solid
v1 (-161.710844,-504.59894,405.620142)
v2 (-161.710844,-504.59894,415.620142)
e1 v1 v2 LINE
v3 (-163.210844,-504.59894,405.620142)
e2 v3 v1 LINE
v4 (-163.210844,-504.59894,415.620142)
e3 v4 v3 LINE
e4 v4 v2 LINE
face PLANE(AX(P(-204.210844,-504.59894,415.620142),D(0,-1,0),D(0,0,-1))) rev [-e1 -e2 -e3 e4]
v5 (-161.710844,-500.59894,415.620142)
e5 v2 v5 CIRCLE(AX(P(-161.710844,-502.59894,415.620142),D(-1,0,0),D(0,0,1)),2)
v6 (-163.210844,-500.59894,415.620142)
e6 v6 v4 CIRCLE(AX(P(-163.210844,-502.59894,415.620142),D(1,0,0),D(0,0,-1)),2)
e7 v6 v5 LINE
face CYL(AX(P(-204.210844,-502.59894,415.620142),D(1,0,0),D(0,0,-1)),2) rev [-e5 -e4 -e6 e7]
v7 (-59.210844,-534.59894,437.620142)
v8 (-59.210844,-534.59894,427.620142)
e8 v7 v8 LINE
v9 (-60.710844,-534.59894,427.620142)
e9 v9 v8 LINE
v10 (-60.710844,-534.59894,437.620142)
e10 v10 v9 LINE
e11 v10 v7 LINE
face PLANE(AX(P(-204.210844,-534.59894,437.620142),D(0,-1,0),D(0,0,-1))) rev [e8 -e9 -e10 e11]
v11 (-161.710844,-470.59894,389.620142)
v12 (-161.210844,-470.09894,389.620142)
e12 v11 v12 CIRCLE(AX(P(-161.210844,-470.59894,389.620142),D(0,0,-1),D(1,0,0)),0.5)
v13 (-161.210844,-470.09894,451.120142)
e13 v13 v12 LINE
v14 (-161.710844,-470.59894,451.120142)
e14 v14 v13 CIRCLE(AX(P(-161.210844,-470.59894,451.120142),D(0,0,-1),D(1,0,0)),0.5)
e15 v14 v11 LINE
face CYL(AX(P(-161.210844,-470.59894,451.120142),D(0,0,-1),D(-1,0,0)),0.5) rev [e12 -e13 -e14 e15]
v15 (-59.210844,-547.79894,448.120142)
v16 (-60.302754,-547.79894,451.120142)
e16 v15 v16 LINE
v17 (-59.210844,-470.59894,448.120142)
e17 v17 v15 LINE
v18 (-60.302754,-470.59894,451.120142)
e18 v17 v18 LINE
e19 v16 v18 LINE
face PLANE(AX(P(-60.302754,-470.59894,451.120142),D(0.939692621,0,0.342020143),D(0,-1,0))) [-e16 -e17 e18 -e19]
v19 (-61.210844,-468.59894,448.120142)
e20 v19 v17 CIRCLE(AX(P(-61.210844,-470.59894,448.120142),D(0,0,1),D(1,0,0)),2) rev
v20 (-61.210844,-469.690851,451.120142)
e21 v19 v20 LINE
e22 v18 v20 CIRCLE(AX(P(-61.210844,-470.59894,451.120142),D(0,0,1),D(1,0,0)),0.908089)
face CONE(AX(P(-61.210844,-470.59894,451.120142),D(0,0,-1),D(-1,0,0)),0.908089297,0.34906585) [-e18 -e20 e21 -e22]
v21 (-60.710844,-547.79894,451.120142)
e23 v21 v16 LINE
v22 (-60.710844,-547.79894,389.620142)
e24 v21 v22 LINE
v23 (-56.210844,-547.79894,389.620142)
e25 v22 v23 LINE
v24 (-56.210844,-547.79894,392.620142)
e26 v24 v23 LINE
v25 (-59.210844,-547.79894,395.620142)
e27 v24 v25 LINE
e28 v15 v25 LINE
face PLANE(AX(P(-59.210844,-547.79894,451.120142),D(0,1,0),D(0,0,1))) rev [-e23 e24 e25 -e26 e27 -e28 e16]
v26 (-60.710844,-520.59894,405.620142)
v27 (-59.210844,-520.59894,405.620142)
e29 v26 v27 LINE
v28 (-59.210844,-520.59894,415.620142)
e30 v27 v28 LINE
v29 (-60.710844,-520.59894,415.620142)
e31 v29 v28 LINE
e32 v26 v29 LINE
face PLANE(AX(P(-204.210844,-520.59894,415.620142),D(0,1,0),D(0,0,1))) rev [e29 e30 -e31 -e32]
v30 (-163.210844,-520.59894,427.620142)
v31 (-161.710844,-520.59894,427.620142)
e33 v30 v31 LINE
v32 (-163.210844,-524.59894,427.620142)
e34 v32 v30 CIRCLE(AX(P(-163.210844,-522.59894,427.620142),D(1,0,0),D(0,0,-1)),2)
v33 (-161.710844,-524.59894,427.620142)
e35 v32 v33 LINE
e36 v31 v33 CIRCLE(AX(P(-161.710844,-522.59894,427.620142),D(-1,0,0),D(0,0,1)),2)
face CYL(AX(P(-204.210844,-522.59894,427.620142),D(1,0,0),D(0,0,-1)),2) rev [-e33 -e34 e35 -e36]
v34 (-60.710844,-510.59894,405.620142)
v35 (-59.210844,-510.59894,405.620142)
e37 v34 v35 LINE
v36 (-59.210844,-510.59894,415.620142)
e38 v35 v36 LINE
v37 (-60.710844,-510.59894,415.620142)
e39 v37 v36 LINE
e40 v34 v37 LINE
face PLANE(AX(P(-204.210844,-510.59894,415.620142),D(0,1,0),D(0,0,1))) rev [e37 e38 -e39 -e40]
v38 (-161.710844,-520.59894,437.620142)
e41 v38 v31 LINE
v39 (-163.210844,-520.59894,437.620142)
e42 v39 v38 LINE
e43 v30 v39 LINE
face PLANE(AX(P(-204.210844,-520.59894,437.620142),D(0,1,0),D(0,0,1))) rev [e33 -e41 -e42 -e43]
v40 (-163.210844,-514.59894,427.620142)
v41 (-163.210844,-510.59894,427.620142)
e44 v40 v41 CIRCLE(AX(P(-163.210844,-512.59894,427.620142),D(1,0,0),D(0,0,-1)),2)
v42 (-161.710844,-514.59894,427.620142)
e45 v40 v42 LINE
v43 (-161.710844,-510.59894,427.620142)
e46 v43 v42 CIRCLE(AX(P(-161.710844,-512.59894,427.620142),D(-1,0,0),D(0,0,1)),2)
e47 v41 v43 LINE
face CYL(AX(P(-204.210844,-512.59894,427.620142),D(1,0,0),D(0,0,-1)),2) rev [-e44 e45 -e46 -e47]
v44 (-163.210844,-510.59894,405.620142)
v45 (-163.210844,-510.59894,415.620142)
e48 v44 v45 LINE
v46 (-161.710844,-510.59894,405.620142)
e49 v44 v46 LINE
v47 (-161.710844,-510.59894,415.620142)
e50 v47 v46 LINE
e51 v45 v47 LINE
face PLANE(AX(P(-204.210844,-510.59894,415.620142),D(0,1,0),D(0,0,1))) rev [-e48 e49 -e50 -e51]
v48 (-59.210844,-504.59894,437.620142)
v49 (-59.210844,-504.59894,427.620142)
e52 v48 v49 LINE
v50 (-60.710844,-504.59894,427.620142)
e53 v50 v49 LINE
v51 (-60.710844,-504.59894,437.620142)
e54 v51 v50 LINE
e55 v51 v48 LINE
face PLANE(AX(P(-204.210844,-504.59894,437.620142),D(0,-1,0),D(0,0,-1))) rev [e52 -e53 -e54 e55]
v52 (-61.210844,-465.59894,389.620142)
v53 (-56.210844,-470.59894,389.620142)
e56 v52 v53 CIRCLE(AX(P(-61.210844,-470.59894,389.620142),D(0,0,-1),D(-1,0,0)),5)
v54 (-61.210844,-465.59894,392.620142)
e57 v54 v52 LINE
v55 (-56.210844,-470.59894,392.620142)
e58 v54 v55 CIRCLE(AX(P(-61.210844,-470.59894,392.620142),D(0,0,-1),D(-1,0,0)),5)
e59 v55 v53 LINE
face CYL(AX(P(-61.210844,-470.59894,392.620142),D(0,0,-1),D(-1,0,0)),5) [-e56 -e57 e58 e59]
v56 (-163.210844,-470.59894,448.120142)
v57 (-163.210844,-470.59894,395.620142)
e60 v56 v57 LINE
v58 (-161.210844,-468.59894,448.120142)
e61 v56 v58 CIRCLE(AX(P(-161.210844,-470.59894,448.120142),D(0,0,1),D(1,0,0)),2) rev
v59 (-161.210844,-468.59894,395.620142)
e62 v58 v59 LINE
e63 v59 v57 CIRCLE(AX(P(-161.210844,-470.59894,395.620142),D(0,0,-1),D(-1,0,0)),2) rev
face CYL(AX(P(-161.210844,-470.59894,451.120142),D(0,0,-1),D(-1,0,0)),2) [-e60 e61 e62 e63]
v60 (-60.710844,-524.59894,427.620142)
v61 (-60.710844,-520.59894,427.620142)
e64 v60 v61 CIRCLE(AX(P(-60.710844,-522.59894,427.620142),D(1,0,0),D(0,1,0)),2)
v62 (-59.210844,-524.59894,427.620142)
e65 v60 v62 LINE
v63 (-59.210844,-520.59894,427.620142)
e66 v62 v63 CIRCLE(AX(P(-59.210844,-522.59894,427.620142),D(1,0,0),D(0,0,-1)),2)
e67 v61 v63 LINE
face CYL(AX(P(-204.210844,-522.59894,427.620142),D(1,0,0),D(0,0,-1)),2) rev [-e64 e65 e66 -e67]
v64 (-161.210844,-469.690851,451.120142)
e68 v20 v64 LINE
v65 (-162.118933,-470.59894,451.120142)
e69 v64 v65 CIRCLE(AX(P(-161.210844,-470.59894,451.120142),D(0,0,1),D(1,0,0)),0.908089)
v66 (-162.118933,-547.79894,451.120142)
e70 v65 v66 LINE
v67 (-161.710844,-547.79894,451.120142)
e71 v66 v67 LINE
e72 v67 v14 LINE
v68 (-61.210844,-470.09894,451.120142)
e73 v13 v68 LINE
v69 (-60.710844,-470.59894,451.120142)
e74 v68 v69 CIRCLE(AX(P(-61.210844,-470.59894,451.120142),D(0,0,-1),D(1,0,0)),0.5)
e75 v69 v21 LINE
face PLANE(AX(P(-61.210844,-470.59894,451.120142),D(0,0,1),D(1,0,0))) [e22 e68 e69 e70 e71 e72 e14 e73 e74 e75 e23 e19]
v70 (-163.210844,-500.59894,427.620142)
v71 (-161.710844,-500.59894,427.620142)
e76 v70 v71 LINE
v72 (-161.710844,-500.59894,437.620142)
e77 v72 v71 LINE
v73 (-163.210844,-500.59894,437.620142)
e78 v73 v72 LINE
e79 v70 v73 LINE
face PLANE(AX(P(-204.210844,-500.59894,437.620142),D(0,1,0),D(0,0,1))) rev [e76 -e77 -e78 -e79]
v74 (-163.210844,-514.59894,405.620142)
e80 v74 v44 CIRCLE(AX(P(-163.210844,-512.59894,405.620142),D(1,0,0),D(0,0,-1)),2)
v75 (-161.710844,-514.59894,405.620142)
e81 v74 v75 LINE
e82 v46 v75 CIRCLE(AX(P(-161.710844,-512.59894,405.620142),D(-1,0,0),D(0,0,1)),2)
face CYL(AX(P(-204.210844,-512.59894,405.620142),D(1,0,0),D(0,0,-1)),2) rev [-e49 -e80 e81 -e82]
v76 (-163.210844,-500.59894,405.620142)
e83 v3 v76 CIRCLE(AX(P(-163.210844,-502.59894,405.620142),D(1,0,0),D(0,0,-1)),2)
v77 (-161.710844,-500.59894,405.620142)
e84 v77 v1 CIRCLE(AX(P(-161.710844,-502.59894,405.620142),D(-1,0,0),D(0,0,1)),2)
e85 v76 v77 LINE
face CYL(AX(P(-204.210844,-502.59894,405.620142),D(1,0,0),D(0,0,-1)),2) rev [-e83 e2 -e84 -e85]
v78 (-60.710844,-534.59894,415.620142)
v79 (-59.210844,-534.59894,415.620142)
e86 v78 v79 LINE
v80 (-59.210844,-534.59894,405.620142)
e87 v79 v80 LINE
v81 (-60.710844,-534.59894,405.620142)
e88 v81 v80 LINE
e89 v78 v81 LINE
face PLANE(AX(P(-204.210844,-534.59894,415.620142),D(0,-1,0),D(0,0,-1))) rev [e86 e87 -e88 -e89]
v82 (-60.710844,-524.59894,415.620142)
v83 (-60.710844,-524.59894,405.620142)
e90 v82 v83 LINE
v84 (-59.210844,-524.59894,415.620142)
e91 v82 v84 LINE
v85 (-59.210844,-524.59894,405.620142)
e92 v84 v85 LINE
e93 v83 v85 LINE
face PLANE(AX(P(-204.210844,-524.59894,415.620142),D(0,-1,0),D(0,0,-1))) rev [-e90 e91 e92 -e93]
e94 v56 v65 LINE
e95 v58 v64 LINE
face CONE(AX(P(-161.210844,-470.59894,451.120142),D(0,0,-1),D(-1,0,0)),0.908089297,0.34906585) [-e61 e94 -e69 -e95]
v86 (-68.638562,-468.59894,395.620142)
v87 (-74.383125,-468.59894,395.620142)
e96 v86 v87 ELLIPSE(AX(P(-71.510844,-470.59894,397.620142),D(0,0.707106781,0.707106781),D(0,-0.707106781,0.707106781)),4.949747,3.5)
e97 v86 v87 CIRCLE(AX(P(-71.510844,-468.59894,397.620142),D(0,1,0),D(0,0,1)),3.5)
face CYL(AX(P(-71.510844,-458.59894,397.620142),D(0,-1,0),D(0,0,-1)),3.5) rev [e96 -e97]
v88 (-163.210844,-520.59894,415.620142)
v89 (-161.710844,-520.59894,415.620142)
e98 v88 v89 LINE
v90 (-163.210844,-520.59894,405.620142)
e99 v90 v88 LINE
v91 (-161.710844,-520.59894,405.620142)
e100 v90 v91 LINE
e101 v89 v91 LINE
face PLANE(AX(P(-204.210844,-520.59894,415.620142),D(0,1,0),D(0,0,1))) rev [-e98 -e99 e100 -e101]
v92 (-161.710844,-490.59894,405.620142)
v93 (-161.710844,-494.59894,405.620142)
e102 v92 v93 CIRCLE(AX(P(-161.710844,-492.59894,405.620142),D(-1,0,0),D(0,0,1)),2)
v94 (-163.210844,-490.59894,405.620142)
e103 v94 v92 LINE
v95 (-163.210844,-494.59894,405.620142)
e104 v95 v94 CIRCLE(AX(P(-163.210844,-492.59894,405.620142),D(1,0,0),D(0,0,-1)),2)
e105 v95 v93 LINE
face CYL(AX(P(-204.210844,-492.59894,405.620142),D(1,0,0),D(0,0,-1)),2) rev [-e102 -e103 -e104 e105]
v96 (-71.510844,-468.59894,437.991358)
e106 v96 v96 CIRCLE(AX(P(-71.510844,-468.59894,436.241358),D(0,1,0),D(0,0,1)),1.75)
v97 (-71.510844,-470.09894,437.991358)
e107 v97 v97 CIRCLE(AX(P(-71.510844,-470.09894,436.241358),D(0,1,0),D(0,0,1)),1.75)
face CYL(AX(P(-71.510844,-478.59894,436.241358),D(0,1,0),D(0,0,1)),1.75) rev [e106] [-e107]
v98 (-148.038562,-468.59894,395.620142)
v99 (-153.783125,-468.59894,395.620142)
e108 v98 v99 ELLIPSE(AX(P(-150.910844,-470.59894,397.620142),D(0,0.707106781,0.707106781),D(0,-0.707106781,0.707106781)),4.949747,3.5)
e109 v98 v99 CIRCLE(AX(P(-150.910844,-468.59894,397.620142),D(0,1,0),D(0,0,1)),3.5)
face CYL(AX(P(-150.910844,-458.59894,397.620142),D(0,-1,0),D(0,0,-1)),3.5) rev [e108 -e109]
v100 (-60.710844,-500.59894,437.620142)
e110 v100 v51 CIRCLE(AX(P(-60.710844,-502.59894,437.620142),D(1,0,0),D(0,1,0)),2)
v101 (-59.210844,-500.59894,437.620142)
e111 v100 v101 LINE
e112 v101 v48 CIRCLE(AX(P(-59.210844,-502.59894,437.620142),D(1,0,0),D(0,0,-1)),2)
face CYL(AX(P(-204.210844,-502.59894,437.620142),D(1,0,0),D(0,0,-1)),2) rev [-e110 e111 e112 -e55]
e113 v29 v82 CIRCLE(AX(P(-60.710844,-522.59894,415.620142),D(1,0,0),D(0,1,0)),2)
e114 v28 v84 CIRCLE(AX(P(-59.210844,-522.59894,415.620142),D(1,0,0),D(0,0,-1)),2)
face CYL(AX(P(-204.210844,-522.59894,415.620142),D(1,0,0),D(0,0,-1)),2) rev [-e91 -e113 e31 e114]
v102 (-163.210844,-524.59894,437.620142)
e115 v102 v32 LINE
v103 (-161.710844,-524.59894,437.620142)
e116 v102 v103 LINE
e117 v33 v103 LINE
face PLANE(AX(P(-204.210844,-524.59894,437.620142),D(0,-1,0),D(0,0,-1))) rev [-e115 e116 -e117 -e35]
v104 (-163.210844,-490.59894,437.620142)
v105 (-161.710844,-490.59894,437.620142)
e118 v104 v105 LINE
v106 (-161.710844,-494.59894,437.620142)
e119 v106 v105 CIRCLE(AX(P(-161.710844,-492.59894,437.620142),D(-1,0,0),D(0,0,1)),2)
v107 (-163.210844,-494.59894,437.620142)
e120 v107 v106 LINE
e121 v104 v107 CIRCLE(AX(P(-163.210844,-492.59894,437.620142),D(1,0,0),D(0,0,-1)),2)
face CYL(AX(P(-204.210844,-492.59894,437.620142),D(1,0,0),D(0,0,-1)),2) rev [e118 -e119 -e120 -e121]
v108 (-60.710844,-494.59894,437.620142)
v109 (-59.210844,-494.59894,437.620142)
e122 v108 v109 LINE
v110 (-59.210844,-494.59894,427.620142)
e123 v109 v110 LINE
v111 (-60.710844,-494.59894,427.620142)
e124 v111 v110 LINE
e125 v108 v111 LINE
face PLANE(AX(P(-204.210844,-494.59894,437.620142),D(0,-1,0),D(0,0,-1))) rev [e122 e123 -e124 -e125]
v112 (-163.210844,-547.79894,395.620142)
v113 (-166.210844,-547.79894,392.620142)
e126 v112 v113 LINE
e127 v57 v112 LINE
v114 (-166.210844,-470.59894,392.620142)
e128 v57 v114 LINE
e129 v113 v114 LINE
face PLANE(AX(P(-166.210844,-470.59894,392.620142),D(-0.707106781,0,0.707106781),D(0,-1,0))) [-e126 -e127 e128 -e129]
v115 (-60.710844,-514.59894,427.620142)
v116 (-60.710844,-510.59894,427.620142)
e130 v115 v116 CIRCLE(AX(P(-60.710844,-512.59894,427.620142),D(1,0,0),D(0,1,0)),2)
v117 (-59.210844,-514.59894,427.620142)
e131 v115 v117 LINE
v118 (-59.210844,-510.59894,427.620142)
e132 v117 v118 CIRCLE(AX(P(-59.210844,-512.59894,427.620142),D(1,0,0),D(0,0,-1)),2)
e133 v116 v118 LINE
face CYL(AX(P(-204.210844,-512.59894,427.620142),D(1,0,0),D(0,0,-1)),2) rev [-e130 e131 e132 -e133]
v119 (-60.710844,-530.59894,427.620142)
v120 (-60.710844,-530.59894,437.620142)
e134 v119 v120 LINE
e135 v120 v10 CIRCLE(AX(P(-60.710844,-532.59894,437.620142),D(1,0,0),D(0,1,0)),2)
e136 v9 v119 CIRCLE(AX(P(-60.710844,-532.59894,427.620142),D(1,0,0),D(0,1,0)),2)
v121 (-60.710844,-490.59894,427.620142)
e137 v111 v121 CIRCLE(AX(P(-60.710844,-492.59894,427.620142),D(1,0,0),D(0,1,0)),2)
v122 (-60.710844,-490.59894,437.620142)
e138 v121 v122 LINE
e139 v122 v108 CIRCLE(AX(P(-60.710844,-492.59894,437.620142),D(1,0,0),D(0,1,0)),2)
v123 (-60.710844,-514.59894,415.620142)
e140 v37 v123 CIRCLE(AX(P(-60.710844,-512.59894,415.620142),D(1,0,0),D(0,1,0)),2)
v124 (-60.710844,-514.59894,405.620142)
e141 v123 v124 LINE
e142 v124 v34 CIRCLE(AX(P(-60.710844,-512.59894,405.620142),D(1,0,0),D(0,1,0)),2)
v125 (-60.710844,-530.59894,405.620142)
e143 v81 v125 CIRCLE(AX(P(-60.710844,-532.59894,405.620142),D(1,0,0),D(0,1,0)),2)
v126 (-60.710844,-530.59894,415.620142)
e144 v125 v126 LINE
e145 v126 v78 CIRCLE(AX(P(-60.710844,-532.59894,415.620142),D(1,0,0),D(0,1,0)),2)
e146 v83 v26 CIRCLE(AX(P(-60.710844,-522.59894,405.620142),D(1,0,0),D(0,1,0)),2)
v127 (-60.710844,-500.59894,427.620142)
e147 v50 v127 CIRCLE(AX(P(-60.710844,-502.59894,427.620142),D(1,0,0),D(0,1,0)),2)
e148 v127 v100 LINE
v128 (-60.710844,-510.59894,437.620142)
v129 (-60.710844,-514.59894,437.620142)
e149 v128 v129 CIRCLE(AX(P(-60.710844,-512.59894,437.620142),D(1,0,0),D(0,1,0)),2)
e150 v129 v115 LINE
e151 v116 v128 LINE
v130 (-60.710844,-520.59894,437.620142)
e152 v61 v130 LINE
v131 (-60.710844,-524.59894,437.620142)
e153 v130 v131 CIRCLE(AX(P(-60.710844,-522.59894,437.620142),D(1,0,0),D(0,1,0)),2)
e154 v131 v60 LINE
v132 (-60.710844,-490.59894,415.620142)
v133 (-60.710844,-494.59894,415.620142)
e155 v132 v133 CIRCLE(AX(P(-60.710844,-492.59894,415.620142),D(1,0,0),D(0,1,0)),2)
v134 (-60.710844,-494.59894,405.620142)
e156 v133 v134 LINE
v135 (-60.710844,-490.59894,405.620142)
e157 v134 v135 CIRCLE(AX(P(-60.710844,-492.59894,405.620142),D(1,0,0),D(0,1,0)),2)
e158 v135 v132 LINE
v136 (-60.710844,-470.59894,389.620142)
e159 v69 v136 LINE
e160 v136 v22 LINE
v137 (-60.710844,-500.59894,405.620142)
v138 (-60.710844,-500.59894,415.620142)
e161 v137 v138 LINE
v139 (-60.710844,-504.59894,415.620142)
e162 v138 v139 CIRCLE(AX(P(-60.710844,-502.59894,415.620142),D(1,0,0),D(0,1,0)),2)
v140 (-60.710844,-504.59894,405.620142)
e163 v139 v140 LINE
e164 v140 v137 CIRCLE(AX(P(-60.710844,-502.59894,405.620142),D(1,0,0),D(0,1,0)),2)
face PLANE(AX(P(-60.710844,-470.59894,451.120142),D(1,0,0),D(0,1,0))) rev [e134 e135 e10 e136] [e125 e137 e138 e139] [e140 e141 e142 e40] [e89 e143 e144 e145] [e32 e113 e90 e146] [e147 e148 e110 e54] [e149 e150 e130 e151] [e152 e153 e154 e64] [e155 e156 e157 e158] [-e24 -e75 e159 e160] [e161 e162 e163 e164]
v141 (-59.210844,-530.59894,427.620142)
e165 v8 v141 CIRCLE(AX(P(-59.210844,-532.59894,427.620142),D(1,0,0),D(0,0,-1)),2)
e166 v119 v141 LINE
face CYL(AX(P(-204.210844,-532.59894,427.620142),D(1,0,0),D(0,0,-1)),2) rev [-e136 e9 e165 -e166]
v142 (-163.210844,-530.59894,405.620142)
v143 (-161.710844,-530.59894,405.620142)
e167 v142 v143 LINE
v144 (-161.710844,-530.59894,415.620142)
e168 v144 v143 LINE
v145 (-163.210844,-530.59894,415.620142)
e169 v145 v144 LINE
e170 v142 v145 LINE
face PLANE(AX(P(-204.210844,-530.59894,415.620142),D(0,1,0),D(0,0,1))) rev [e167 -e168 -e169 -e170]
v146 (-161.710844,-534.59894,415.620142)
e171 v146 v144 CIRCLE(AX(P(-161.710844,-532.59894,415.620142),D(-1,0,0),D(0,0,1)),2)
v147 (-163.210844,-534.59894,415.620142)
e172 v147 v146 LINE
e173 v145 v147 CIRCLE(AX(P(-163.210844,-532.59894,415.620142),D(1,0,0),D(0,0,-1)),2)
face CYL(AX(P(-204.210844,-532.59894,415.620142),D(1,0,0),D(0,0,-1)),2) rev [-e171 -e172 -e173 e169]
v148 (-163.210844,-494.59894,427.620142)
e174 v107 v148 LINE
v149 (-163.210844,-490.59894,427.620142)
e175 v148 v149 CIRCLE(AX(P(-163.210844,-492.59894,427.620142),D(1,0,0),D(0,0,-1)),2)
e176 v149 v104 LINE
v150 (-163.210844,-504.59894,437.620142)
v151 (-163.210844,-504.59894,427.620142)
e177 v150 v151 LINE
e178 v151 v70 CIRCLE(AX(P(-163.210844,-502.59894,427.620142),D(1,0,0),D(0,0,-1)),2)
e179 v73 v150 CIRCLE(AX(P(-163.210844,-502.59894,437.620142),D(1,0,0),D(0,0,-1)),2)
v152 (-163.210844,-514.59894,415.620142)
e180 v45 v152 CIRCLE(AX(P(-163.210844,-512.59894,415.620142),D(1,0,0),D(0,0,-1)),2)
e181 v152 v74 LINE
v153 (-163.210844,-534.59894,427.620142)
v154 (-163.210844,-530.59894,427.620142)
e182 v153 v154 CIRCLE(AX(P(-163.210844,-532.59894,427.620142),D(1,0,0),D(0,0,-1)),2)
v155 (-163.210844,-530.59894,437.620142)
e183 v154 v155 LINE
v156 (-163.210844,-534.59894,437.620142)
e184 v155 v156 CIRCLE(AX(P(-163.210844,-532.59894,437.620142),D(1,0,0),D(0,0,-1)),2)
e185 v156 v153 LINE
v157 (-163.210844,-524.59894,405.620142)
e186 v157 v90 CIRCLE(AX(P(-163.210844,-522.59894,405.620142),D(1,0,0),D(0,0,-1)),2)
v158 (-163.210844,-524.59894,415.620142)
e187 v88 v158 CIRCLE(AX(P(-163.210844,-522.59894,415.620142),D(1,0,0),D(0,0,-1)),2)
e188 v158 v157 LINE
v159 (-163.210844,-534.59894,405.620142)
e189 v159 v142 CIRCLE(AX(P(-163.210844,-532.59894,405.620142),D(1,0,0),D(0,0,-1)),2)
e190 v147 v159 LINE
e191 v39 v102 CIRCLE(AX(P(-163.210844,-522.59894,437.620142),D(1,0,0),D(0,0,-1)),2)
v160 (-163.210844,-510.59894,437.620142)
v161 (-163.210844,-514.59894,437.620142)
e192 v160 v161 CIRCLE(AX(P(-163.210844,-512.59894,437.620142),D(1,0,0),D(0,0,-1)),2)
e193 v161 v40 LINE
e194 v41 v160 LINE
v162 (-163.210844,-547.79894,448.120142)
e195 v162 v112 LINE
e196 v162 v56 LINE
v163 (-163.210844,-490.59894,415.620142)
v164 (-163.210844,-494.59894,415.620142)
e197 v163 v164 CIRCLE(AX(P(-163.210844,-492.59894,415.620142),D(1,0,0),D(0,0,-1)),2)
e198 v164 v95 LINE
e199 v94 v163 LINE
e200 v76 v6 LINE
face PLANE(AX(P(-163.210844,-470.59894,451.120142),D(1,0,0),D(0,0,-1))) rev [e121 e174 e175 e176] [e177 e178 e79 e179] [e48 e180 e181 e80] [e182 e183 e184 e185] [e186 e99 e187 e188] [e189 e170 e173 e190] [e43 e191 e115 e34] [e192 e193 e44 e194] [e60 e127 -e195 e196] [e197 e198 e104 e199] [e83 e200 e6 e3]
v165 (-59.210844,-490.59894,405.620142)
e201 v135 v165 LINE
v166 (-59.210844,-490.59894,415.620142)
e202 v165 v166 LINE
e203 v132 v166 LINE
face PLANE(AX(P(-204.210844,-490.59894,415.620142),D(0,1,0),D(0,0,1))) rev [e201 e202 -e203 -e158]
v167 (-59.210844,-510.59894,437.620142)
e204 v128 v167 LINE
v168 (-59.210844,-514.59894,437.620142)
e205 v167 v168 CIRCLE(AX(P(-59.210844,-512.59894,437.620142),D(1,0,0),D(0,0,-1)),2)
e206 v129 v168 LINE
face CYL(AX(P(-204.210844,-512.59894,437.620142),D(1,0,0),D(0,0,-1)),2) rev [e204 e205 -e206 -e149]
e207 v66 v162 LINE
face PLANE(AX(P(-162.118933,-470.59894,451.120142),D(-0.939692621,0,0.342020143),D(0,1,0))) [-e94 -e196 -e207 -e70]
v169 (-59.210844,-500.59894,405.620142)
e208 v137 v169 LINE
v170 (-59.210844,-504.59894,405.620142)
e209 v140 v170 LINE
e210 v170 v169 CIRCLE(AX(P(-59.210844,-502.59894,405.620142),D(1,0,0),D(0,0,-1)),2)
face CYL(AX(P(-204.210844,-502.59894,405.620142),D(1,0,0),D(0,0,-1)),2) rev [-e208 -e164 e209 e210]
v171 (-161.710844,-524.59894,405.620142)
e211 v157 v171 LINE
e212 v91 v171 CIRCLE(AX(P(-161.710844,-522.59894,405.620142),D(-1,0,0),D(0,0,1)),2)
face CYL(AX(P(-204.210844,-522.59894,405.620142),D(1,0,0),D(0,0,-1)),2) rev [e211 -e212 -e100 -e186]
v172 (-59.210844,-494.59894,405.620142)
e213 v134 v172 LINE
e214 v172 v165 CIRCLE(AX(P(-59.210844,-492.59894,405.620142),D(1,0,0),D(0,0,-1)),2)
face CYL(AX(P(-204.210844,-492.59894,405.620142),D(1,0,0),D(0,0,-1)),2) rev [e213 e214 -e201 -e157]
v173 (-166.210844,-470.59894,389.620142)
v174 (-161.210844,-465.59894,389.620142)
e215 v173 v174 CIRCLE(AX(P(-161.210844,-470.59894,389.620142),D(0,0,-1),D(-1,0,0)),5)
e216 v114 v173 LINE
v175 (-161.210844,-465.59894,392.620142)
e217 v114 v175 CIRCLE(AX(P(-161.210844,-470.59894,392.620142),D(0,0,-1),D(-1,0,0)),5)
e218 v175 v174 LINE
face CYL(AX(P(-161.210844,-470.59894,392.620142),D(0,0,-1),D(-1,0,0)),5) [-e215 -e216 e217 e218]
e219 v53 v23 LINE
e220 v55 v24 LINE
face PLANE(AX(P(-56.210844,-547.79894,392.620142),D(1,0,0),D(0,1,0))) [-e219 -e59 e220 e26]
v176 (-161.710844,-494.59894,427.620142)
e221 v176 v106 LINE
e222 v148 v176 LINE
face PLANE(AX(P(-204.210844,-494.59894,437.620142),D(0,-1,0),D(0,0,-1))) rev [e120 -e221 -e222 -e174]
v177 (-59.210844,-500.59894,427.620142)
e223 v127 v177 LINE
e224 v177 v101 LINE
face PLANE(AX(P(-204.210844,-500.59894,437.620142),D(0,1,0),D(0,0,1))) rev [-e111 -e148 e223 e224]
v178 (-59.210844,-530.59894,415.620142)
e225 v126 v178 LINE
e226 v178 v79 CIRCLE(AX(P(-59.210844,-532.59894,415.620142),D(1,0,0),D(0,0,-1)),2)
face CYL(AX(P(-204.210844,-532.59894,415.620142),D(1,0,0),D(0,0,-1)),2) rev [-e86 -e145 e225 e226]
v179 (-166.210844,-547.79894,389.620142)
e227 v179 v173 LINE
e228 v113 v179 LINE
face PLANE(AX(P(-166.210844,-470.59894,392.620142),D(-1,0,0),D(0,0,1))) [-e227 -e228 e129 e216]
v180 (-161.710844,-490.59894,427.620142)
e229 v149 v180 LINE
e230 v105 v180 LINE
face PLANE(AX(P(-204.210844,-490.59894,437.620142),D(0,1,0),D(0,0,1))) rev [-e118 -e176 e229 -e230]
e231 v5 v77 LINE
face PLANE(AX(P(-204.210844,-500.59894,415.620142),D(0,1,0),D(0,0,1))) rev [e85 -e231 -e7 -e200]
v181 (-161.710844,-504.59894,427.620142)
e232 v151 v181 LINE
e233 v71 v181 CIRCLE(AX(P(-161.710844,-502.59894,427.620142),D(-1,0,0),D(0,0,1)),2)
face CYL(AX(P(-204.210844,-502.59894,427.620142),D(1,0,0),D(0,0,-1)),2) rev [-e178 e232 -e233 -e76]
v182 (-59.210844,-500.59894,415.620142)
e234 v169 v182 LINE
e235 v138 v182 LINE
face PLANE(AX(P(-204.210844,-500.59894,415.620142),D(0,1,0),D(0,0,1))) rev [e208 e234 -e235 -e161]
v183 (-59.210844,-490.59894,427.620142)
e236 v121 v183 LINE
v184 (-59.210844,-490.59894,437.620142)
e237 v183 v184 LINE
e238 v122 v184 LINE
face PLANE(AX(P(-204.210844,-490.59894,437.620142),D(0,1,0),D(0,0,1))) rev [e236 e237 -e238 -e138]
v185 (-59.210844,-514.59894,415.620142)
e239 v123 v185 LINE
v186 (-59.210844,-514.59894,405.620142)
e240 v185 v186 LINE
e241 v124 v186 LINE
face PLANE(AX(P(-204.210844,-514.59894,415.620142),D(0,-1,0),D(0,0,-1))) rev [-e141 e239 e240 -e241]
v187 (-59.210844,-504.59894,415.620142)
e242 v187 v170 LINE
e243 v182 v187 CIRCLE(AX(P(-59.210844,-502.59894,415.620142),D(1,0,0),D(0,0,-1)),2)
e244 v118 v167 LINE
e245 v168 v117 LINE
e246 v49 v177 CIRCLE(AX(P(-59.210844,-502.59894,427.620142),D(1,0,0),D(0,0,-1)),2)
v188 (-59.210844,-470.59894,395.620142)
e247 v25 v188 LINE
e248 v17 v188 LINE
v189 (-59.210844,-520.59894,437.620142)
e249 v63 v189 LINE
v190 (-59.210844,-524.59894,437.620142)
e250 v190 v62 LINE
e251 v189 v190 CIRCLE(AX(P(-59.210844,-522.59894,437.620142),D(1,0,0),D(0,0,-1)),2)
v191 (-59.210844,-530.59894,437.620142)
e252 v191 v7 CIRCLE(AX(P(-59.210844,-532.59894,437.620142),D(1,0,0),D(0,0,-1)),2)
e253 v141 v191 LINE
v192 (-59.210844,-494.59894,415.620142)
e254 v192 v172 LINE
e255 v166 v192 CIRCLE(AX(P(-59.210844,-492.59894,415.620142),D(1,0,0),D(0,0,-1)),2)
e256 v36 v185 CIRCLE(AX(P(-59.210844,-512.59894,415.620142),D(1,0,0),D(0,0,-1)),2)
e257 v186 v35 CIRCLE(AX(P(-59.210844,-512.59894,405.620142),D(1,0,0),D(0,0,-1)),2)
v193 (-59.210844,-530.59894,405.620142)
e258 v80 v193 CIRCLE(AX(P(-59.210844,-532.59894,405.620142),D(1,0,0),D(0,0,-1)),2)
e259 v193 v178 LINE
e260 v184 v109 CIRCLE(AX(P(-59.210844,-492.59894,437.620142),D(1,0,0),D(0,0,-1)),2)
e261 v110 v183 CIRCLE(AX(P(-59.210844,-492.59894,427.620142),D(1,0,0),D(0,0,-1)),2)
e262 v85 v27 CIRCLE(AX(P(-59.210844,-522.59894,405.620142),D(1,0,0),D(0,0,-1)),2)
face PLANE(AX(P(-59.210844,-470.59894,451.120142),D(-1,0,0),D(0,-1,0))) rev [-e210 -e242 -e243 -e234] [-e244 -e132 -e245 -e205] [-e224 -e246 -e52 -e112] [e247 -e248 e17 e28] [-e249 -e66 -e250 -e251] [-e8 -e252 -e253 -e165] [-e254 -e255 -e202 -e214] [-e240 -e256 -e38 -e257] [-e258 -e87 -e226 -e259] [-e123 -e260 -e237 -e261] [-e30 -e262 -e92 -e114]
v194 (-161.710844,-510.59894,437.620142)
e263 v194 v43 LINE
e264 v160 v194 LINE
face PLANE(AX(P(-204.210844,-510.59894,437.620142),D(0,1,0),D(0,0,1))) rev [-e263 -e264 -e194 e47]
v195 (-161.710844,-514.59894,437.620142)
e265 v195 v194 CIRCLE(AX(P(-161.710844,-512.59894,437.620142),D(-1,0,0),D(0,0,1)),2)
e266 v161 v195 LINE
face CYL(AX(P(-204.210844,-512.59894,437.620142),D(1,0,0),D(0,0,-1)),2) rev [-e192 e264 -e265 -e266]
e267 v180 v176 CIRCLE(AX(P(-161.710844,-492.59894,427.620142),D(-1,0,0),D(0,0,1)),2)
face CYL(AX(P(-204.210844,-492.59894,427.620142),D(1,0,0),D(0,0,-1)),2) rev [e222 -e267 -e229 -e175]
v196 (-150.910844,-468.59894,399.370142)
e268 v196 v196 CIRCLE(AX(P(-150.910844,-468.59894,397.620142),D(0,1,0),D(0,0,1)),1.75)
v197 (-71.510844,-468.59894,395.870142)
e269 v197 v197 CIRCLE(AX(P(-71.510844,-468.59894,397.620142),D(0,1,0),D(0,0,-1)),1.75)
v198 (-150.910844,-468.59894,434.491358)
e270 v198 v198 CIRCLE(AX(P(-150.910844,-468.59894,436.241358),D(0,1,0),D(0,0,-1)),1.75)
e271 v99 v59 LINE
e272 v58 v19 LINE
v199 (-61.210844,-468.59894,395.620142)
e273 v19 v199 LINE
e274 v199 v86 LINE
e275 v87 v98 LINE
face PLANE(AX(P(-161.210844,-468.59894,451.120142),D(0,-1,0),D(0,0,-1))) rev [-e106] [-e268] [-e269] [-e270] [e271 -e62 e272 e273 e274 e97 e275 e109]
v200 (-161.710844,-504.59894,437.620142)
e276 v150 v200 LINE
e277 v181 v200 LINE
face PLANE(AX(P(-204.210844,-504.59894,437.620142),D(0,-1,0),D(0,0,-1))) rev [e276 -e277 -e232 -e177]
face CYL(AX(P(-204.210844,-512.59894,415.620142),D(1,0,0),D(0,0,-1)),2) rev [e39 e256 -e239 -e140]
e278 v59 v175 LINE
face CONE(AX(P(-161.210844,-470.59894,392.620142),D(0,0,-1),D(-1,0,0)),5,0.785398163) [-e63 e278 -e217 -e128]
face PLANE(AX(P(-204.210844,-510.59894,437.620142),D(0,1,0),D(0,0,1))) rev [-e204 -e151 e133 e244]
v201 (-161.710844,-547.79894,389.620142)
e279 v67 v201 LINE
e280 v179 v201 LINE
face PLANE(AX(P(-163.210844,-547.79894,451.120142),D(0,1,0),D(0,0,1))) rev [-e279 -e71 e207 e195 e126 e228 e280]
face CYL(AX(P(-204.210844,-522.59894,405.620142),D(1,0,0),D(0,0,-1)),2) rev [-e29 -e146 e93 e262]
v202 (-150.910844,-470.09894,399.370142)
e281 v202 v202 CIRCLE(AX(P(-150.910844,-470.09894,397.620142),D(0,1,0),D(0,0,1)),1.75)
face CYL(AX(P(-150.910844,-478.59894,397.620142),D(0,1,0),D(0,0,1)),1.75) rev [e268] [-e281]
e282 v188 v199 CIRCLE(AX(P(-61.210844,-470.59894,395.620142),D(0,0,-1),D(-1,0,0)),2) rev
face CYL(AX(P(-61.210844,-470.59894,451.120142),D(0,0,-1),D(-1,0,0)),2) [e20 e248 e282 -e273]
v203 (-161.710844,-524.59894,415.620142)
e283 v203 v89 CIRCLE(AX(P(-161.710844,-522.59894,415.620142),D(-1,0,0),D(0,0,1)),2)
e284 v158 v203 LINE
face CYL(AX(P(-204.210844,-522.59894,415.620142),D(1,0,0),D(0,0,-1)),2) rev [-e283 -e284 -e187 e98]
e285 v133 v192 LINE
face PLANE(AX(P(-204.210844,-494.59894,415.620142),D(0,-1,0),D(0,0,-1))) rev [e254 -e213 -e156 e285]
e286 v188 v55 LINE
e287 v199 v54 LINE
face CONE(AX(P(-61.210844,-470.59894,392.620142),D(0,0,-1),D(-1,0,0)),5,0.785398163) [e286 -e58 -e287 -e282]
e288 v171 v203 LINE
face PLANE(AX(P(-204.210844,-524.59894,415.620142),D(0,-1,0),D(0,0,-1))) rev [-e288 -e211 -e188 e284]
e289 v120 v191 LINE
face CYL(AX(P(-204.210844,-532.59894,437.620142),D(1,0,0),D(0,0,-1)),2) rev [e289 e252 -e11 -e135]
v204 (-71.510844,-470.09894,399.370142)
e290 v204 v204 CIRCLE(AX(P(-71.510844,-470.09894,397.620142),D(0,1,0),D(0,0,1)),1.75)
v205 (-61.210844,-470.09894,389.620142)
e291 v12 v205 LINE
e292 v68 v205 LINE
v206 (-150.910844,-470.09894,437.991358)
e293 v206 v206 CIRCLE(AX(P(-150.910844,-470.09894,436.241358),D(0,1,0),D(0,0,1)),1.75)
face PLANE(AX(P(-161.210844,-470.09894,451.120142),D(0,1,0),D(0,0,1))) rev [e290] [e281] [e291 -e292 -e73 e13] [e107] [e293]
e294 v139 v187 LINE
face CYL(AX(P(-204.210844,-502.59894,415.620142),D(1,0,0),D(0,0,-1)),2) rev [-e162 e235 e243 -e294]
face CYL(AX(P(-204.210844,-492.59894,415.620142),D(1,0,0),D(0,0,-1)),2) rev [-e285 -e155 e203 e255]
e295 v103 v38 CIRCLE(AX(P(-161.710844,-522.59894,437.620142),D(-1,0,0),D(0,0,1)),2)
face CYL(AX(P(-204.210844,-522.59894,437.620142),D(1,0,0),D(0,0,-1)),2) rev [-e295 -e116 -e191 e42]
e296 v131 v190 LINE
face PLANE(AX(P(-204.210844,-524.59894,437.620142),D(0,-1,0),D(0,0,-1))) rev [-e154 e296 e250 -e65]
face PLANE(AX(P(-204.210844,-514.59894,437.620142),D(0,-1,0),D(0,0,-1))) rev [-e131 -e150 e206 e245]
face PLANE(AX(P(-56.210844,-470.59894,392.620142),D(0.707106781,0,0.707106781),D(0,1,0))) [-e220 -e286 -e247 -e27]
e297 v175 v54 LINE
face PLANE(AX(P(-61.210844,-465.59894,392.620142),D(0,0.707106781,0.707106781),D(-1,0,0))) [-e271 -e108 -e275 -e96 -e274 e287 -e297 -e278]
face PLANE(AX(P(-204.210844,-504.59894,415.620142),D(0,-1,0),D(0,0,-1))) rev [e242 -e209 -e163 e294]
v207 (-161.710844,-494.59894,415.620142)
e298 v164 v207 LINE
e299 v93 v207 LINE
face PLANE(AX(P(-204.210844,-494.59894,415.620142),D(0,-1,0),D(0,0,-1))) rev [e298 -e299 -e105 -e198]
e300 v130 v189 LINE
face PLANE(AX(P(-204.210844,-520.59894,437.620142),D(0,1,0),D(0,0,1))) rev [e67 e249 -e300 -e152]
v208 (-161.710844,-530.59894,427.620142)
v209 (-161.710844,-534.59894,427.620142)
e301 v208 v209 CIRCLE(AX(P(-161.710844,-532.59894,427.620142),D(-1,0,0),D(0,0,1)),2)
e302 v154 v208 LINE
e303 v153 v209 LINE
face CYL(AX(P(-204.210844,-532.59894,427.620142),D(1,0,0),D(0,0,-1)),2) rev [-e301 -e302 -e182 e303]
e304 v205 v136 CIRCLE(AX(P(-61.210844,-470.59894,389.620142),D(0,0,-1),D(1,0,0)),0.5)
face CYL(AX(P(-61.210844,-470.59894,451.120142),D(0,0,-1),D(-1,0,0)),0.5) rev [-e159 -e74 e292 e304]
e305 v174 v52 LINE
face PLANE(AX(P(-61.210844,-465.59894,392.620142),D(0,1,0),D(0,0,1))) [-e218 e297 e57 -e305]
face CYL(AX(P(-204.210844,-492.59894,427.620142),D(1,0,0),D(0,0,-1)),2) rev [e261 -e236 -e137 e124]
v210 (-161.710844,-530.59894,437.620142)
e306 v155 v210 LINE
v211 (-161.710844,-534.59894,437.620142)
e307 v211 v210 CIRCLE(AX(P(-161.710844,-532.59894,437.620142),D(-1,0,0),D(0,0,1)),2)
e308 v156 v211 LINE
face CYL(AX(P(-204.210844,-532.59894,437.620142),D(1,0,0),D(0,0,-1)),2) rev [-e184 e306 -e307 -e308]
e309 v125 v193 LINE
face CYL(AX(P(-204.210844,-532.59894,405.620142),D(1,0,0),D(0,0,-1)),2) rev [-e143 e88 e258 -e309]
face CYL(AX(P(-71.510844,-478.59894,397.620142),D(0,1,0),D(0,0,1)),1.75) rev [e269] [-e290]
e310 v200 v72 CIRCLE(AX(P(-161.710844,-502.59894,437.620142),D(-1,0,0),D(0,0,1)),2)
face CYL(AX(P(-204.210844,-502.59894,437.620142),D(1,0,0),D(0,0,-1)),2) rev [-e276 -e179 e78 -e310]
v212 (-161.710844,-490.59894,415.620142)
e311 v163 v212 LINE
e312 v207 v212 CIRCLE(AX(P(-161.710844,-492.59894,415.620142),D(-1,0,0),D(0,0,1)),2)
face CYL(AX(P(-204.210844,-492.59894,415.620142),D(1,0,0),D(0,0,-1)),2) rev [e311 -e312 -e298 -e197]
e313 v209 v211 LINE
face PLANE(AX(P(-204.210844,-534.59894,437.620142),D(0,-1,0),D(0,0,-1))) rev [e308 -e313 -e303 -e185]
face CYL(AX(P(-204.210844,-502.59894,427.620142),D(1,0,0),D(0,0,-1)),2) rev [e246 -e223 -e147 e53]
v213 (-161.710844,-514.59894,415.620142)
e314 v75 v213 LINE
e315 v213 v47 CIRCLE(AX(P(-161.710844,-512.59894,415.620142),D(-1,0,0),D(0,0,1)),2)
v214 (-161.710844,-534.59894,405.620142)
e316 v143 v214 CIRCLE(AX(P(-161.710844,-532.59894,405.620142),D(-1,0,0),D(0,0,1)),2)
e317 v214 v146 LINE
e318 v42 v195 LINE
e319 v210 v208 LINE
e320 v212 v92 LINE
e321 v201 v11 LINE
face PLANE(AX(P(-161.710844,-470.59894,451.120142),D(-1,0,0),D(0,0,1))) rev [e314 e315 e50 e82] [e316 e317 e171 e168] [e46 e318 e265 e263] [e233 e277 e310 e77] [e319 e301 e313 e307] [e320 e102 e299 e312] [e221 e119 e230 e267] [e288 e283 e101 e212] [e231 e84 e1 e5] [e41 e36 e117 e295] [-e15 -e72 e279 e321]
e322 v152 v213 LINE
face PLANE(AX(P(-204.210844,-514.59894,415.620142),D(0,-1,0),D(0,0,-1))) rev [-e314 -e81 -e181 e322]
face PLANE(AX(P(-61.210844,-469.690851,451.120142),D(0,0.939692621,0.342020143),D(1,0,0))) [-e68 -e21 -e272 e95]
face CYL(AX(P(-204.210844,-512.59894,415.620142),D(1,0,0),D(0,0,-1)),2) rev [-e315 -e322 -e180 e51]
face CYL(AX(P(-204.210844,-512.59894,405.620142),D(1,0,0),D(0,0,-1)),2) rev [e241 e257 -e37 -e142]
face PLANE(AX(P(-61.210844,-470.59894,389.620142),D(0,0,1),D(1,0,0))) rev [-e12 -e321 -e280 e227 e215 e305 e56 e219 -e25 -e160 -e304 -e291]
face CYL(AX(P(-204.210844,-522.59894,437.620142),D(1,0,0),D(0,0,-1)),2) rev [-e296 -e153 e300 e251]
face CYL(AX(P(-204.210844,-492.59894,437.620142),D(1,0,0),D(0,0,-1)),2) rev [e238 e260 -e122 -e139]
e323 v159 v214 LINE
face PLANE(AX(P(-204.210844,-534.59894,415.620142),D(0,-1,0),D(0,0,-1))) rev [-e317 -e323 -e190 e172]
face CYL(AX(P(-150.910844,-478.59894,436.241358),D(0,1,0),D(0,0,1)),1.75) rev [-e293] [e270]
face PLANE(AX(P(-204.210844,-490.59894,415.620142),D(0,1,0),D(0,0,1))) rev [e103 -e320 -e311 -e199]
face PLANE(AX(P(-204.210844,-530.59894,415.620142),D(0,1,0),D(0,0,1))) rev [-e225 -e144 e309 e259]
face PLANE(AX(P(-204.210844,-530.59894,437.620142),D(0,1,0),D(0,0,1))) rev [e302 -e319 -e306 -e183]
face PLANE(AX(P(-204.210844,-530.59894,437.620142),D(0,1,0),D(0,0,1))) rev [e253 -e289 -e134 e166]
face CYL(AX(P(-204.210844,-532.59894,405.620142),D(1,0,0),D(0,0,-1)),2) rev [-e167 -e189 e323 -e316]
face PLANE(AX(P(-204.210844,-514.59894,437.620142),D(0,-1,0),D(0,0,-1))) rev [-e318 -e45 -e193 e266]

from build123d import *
from OCP.BRepFilletAPI import BRepFilletAPI_MakeChamfer

# Parameters (mm, degrees)
BOSS_EXTRUDE1_DEPTH = 61.5
CHAMFER1_SIZE       = 3
CHAMFER1_SIZE2      = 1.091910703
SKETCH4_R           = 1.75
CUT_EXTRUDE1_DEPTH  = 10
BOSS_EXTRUDE2_DEPTH = 3
CHAMFER2_SIZE       = 3
CUT_EXTRUDE2_DEPTH  = 145
SKETCH7_R           = 3.5
CUT_EXTRUDE3_DEPTH  = 10


with BuildPart() as part:
    # Sketch3 → Boss-Extrude1 (new body)
    with BuildSketch(Plane.XY.offset(389.620141885)):
        with BuildLine():
            Line((-161.210843614, -470.098939869), (-61.210843614, -470.098939869))
            ThreePointArc((-61.210843614, -470.098939869), (-60.857290223, -470.245386479), (-60.710843614, -470.598939869))
            Line((-60.710843614, -470.598939869), (-60.710843614, -547.798939869))
            Line((-60.710843614, -547.798939869), (-59.210843614, -547.798939869))
            Line((-59.210843614, -547.798939869), (-59.210843614, -470.598939869))
            ThreePointArc((-59.210843614, -470.598939869), (-59.796630051, -469.184726307), (-61.210843614, -468.598939869))
            Line((-61.210843614, -468.598939869), (-161.210843614, -468.598939869))
            ThreePointArc((-161.210843614, -468.598939869), (-162.625057176, -469.184726307), (-163.210843614, -470.598939869))
            Line((-163.210843614, -470.598939869), (-163.210843614, -547.798939869))
            Line((-163.210843614, -547.798939869), (-161.710843614, -547.798939869))
            Line((-161.710843614, -547.798939869), (-161.710843614, -544.99774542))
            Line((-161.710843614, -544.99774542), (-161.710843614, -470.598939869))
            ThreePointArc((-161.710843614, -470.598939869), (-161.564397004, -470.245386479), (-161.210843614, -470.098939869))
        make_face()
    extrude(amount=BOSS_EXTRUDE1_DEPTH)

    # Chamfer1: one chamfer whose edges measure the first distance from different faces: ONE call of the kernel's chamfer builder (chamfer() names one face for all edges)
    chamfer1_edges_1 = [part.edges().sort_by_distance(p)[0] for p in [
        (-59.796630051, -469.184726307, 451.120141885),
    ]]
    chamfer1_side_1 = [part.faces().sort_by_distance(p)[0] for p in [
        (-59.796630051, -469.184726307, 420.370141885),
    ]]
    chamfer1_edges_2 = [part.edges().sort_by_distance(p)[0] for p in [
        (-111.210843614, -468.598939869, 451.120141885),
    ]]
    chamfer1_side_2 = [part.faces().sort_by_distance(p)[0] for p in [
        (-111.210843614, -468.598939869, 420.370141885),
    ]]
    chamfer1_edges_3 = [part.edges().sort_by_distance(p)[0] for p in [
        (-162.625057176, -469.184726307, 451.120141885),
    ]]
    chamfer1_side_3 = [part.faces().sort_by_distance(p)[0] for p in [
        (-162.625057176, -469.184726307, 420.370141885),
    ]]
    chamfer1_edges_4 = [part.edges().sort_by_distance(p)[0] for p in [
        (-163.210843614, -509.198939869, 451.120141885),
    ]]
    chamfer1_side_4 = [part.faces().sort_by_distance(p)[0] for p in [
        (-163.210843614, -509.198939869, 420.370141885),
    ]]
    chamfer1_edges_5 = [part.edges().sort_by_distance(p)[0] for p in [
        (-59.210843614, -509.198939869, 451.120141885),
    ]]
    chamfer1_side_5 = [part.faces().sort_by_distance(p)[0] for p in [
        (-59.210843614, -509.198939869, 420.370141885),
    ]]
    chamfer1 = BRepFilletAPI_MakeChamfer(part.part.solid().wrapped)
    for e in chamfer1_edges_1:
        chamfer1.Add(CHAMFER1_SIZE, CHAMFER1_SIZE2, e.wrapped, chamfer1_side_1[0].wrapped)  # the first distance lies on this face
    for e in chamfer1_edges_2:
        chamfer1.Add(CHAMFER1_SIZE, CHAMFER1_SIZE2, e.wrapped, chamfer1_side_2[0].wrapped)  # the first distance lies on this face
    for e in chamfer1_edges_3:
        chamfer1.Add(CHAMFER1_SIZE, CHAMFER1_SIZE2, e.wrapped, chamfer1_side_3[0].wrapped)  # the first distance lies on this face
    for e in chamfer1_edges_4:
        chamfer1.Add(CHAMFER1_SIZE, CHAMFER1_SIZE2, e.wrapped, chamfer1_side_4[0].wrapped)  # the first distance lies on this face
    for e in chamfer1_edges_5:
        chamfer1.Add(CHAMFER1_SIZE, CHAMFER1_SIZE2, e.wrapped, chamfer1_side_5[0].wrapped)  # the first distance lies on this face
    add(Compound.cast(chamfer1.Shape()), mode=Mode.REPLACE)

    # Sketch4 → Cut-Extrude1 (cut)
    with BuildSketch(Plane(origin=(0, -468.598939869, 0), x_dir=(1, 0, 0), z_dir=(0, 1, 0))):
        with Locations(Location((-150.910843614, -397.620141885, 0), (0, 0, 270))):
            Circle(SKETCH4_R)
        with Locations(Location((-71.510843614, -397.620141885, 0), (0, 0, 270))):
            Circle(SKETCH4_R)
        with Locations(Location((-71.510843614, -436.241358014, 0), (0, 0, 270))):
            Circle(SKETCH4_R)
        with Locations(Location((-150.910843614, -436.241358014, 0), (0, 0, 270))):
            Circle(SKETCH4_R)
    extrude(amount=-CUT_EXTRUDE1_DEPTH, mode=Mode.SUBTRACT)

    # Sketch5 → Boss-Extrude2 (add)
    with BuildSketch(Plane(origin=(0, 0, 389.620141885), x_dir=(-1, 0, 0), z_dir=(0, 0, -1))):
        with BuildLine():
            Line((59.310843614, -547.798939869), (59.310843614, -470.598939869))
            ThreePointArc((59.310843614, -470.598939869), (59.867340729, -469.255436985), (61.210843614, -468.698939869))
            Line((61.210843614, -468.698939869), (161.210843614, -468.698939869))
            ThreePointArc((161.210843614, -468.698939869), (162.554346498, -469.255436985), (163.110843614, -470.598939869))
            Line((163.110843614, -470.598939869), (163.110843614, -547.798939869))
            Line((163.110843614, -547.798939869), (166.210843614, -547.798939869))
            Line((166.210843614, -547.798939869), (166.210843614, -470.598939869))
            ThreePointArc((166.210843614, -470.598939869), (164.74637752, -467.063405963), (161.210843614, -465.598939869))
            Line((161.210843614, -465.598939869), (61.210843614, -465.598939869))
            ThreePointArc((61.210843614, -465.598939869), (57.675309708, -467.063405963), (56.210843614, -470.598939869))
            Line((56.210843614, -470.598939869), (56.210843614, -547.798939869))
            Line((56.210843614, -547.798939869), (59.310843614, -547.798939869))
        make_face()
    extrude(amount=-BOSS_EXTRUDE2_DEPTH)

    # Chamfer2
    chamfer2_edges = [part.edges().sort_by_distance(p)[0] for p in [
        (-163.210843614, -509.198939869, 392.620141885),
        (-162.625057176, -469.184726307, 392.620141885),
        (-111.210843614, -468.598939869, 392.620141885),
        (-59.796630051, -469.184726307, 392.620141885),
        (-59.210843614, -509.198939869, 392.620141885),
    ]]
    chamfer(chamfer2_edges, length=CHAMFER2_SIZE - 0.0001)  # a hair under: the kernel refuses the full size

    # Sketch6 → Cut-Extrude2 (cut)
    with BuildSketch(Plane(origin=(-59.210843614, 0, 0), x_dir=(0, 0, -1), z_dir=(1, 0, 0))):
        with BuildLine():
            Line((-437.620141885, -490.598939869), (-427.620141885, -490.598939869))
            ThreePointArc((-427.620141885, -490.598939869), (-425.620141885, -492.598939869), (-427.620141885, -494.598939869))
            Line((-427.620141885, -494.598939869), (-437.620141885, -494.598939869))
            ThreePointArc((-437.620141885, -494.598939869), (-439.620141885, -492.598939869), (-437.620141885, -490.598939869))
        make_face()
        with BuildLine():
            Line((-415.620141885, -490.598939869), (-405.620141885, -490.598939869))
            ThreePointArc((-405.620141885, -490.598939869), (-403.620141885, -492.598939869), (-405.620141885, -494.598939869))
            Line((-405.620141885, -494.598939869), (-415.620141885, -494.598939869))
            ThreePointArc((-415.620141885, -494.598939869), (-417.620141885, -492.598939869), (-415.620141885, -490.598939869))
        make_face()
        with BuildLine():
            Line((-437.620141885, -500.598939869), (-427.620141885, -500.598939869))
            ThreePointArc((-427.620141885, -500.598939869), (-425.620141885, -502.598939869), (-427.620141885, -504.598939869))
            Line((-427.620141885, -504.598939869), (-437.620141885, -504.598939869))
            ThreePointArc((-437.620141885, -504.598939869), (-439.620141885, -502.598939869), (-437.620141885, -500.598939869))
        make_face()
        with BuildLine():
            Line((-415.620141885, -500.598939869), (-405.620141885, -500.598939869))
            ThreePointArc((-405.620141885, -500.598939869), (-403.620141885, -502.598939869), (-405.620141885, -504.598939869))
            Line((-405.620141885, -504.598939869), (-415.620141885, -504.598939869))
            ThreePointArc((-415.620141885, -504.598939869), (-417.620141885, -502.598939869), (-415.620141885, -500.598939869))
        make_face()
        with BuildLine():
            Line((-437.620141885, -510.598939869), (-427.620141885, -510.598939869))
            ThreePointArc((-427.620141885, -510.598939869), (-425.620141885, -512.598939869), (-427.620141885, -514.598939869))
            Line((-427.620141885, -514.598939869), (-437.620141885, -514.598939869))
            ThreePointArc((-437.620141885, -514.598939869), (-439.620141885, -512.598939869), (-437.620141885, -510.598939869))
        make_face()
        with BuildLine():
            Line((-415.620141885, -510.598939869), (-405.620141885, -510.598939869))
            ThreePointArc((-405.620141885, -510.598939869), (-403.620141885, -512.598939869), (-405.620141885, -514.598939869))
            Line((-405.620141885, -514.598939869), (-415.620141885, -514.598939869))
            ThreePointArc((-415.620141885, -514.598939869), (-417.620141885, -512.598939869), (-415.620141885, -510.598939869))
        make_face()
        with BuildLine():
            Line((-437.620141885, -520.598939869), (-427.620141885, -520.598939869))
            ThreePointArc((-427.620141885, -520.598939869), (-425.620141885, -522.598939869), (-427.620141885, -524.598939869))
            Line((-427.620141885, -524.598939869), (-437.620141885, -524.598939869))
            ThreePointArc((-437.620141885, -524.598939869), (-439.620141885, -522.598939869), (-437.620141885, -520.598939869))
        make_face()
        with BuildLine():
            Line((-415.620141885, -520.598939869), (-405.620141885, -520.598939869))
            ThreePointArc((-405.620141885, -520.598939869), (-403.620141885, -522.598939869), (-405.620141885, -524.598939869))
            Line((-405.620141885, -524.598939869), (-415.620141885, -524.598939869))
            ThreePointArc((-415.620141885, -524.598939869), (-417.620141885, -522.598939869), (-415.620141885, -520.598939869))
        make_face()
        with BuildLine():
            Line((-437.620141885, -530.598939869), (-427.620141885, -530.598939869))
            ThreePointArc((-427.620141885, -530.598939869), (-425.620141885, -532.598939869), (-427.620141885, -534.598939869))
            Line((-427.620141885, -534.598939869), (-437.620141885, -534.598939869))
            ThreePointArc((-437.620141885, -534.598939869), (-439.620141885, -532.598939869), (-437.620141885, -530.598939869))
        make_face()
        with BuildLine():
            Line((-415.620141885, -530.598939869), (-405.620141885, -530.598939869))
            ThreePointArc((-405.620141885, -530.598939869), (-403.620141885, -532.598939869), (-405.620141885, -534.598939869))
            Line((-405.620141885, -534.598939869), (-415.620141885, -534.598939869))
            ThreePointArc((-415.620141885, -534.598939869), (-417.620141885, -532.598939869), (-415.620141885, -530.598939869))
        make_face()
    extrude(amount=-CUT_EXTRUDE2_DEPTH, mode=Mode.SUBTRACT)

    # Sketch7 → Cut-Extrude3 (cut)
    with BuildSketch(Plane(origin=(0, -468.598939869, 0), x_dir=(1, 0, 0), z_dir=(0, 1, 0))):
        with Locations((-150.910843614, -397.620141885)):
            Circle(SKETCH7_R)
        with Locations((-71.510843614, -397.620141885)):
            Circle(SKETCH7_R)
    extrude(amount=CUT_EXTRUDE3_DEPTH, mode=Mode.SUBTRACT)


solid = part.part
